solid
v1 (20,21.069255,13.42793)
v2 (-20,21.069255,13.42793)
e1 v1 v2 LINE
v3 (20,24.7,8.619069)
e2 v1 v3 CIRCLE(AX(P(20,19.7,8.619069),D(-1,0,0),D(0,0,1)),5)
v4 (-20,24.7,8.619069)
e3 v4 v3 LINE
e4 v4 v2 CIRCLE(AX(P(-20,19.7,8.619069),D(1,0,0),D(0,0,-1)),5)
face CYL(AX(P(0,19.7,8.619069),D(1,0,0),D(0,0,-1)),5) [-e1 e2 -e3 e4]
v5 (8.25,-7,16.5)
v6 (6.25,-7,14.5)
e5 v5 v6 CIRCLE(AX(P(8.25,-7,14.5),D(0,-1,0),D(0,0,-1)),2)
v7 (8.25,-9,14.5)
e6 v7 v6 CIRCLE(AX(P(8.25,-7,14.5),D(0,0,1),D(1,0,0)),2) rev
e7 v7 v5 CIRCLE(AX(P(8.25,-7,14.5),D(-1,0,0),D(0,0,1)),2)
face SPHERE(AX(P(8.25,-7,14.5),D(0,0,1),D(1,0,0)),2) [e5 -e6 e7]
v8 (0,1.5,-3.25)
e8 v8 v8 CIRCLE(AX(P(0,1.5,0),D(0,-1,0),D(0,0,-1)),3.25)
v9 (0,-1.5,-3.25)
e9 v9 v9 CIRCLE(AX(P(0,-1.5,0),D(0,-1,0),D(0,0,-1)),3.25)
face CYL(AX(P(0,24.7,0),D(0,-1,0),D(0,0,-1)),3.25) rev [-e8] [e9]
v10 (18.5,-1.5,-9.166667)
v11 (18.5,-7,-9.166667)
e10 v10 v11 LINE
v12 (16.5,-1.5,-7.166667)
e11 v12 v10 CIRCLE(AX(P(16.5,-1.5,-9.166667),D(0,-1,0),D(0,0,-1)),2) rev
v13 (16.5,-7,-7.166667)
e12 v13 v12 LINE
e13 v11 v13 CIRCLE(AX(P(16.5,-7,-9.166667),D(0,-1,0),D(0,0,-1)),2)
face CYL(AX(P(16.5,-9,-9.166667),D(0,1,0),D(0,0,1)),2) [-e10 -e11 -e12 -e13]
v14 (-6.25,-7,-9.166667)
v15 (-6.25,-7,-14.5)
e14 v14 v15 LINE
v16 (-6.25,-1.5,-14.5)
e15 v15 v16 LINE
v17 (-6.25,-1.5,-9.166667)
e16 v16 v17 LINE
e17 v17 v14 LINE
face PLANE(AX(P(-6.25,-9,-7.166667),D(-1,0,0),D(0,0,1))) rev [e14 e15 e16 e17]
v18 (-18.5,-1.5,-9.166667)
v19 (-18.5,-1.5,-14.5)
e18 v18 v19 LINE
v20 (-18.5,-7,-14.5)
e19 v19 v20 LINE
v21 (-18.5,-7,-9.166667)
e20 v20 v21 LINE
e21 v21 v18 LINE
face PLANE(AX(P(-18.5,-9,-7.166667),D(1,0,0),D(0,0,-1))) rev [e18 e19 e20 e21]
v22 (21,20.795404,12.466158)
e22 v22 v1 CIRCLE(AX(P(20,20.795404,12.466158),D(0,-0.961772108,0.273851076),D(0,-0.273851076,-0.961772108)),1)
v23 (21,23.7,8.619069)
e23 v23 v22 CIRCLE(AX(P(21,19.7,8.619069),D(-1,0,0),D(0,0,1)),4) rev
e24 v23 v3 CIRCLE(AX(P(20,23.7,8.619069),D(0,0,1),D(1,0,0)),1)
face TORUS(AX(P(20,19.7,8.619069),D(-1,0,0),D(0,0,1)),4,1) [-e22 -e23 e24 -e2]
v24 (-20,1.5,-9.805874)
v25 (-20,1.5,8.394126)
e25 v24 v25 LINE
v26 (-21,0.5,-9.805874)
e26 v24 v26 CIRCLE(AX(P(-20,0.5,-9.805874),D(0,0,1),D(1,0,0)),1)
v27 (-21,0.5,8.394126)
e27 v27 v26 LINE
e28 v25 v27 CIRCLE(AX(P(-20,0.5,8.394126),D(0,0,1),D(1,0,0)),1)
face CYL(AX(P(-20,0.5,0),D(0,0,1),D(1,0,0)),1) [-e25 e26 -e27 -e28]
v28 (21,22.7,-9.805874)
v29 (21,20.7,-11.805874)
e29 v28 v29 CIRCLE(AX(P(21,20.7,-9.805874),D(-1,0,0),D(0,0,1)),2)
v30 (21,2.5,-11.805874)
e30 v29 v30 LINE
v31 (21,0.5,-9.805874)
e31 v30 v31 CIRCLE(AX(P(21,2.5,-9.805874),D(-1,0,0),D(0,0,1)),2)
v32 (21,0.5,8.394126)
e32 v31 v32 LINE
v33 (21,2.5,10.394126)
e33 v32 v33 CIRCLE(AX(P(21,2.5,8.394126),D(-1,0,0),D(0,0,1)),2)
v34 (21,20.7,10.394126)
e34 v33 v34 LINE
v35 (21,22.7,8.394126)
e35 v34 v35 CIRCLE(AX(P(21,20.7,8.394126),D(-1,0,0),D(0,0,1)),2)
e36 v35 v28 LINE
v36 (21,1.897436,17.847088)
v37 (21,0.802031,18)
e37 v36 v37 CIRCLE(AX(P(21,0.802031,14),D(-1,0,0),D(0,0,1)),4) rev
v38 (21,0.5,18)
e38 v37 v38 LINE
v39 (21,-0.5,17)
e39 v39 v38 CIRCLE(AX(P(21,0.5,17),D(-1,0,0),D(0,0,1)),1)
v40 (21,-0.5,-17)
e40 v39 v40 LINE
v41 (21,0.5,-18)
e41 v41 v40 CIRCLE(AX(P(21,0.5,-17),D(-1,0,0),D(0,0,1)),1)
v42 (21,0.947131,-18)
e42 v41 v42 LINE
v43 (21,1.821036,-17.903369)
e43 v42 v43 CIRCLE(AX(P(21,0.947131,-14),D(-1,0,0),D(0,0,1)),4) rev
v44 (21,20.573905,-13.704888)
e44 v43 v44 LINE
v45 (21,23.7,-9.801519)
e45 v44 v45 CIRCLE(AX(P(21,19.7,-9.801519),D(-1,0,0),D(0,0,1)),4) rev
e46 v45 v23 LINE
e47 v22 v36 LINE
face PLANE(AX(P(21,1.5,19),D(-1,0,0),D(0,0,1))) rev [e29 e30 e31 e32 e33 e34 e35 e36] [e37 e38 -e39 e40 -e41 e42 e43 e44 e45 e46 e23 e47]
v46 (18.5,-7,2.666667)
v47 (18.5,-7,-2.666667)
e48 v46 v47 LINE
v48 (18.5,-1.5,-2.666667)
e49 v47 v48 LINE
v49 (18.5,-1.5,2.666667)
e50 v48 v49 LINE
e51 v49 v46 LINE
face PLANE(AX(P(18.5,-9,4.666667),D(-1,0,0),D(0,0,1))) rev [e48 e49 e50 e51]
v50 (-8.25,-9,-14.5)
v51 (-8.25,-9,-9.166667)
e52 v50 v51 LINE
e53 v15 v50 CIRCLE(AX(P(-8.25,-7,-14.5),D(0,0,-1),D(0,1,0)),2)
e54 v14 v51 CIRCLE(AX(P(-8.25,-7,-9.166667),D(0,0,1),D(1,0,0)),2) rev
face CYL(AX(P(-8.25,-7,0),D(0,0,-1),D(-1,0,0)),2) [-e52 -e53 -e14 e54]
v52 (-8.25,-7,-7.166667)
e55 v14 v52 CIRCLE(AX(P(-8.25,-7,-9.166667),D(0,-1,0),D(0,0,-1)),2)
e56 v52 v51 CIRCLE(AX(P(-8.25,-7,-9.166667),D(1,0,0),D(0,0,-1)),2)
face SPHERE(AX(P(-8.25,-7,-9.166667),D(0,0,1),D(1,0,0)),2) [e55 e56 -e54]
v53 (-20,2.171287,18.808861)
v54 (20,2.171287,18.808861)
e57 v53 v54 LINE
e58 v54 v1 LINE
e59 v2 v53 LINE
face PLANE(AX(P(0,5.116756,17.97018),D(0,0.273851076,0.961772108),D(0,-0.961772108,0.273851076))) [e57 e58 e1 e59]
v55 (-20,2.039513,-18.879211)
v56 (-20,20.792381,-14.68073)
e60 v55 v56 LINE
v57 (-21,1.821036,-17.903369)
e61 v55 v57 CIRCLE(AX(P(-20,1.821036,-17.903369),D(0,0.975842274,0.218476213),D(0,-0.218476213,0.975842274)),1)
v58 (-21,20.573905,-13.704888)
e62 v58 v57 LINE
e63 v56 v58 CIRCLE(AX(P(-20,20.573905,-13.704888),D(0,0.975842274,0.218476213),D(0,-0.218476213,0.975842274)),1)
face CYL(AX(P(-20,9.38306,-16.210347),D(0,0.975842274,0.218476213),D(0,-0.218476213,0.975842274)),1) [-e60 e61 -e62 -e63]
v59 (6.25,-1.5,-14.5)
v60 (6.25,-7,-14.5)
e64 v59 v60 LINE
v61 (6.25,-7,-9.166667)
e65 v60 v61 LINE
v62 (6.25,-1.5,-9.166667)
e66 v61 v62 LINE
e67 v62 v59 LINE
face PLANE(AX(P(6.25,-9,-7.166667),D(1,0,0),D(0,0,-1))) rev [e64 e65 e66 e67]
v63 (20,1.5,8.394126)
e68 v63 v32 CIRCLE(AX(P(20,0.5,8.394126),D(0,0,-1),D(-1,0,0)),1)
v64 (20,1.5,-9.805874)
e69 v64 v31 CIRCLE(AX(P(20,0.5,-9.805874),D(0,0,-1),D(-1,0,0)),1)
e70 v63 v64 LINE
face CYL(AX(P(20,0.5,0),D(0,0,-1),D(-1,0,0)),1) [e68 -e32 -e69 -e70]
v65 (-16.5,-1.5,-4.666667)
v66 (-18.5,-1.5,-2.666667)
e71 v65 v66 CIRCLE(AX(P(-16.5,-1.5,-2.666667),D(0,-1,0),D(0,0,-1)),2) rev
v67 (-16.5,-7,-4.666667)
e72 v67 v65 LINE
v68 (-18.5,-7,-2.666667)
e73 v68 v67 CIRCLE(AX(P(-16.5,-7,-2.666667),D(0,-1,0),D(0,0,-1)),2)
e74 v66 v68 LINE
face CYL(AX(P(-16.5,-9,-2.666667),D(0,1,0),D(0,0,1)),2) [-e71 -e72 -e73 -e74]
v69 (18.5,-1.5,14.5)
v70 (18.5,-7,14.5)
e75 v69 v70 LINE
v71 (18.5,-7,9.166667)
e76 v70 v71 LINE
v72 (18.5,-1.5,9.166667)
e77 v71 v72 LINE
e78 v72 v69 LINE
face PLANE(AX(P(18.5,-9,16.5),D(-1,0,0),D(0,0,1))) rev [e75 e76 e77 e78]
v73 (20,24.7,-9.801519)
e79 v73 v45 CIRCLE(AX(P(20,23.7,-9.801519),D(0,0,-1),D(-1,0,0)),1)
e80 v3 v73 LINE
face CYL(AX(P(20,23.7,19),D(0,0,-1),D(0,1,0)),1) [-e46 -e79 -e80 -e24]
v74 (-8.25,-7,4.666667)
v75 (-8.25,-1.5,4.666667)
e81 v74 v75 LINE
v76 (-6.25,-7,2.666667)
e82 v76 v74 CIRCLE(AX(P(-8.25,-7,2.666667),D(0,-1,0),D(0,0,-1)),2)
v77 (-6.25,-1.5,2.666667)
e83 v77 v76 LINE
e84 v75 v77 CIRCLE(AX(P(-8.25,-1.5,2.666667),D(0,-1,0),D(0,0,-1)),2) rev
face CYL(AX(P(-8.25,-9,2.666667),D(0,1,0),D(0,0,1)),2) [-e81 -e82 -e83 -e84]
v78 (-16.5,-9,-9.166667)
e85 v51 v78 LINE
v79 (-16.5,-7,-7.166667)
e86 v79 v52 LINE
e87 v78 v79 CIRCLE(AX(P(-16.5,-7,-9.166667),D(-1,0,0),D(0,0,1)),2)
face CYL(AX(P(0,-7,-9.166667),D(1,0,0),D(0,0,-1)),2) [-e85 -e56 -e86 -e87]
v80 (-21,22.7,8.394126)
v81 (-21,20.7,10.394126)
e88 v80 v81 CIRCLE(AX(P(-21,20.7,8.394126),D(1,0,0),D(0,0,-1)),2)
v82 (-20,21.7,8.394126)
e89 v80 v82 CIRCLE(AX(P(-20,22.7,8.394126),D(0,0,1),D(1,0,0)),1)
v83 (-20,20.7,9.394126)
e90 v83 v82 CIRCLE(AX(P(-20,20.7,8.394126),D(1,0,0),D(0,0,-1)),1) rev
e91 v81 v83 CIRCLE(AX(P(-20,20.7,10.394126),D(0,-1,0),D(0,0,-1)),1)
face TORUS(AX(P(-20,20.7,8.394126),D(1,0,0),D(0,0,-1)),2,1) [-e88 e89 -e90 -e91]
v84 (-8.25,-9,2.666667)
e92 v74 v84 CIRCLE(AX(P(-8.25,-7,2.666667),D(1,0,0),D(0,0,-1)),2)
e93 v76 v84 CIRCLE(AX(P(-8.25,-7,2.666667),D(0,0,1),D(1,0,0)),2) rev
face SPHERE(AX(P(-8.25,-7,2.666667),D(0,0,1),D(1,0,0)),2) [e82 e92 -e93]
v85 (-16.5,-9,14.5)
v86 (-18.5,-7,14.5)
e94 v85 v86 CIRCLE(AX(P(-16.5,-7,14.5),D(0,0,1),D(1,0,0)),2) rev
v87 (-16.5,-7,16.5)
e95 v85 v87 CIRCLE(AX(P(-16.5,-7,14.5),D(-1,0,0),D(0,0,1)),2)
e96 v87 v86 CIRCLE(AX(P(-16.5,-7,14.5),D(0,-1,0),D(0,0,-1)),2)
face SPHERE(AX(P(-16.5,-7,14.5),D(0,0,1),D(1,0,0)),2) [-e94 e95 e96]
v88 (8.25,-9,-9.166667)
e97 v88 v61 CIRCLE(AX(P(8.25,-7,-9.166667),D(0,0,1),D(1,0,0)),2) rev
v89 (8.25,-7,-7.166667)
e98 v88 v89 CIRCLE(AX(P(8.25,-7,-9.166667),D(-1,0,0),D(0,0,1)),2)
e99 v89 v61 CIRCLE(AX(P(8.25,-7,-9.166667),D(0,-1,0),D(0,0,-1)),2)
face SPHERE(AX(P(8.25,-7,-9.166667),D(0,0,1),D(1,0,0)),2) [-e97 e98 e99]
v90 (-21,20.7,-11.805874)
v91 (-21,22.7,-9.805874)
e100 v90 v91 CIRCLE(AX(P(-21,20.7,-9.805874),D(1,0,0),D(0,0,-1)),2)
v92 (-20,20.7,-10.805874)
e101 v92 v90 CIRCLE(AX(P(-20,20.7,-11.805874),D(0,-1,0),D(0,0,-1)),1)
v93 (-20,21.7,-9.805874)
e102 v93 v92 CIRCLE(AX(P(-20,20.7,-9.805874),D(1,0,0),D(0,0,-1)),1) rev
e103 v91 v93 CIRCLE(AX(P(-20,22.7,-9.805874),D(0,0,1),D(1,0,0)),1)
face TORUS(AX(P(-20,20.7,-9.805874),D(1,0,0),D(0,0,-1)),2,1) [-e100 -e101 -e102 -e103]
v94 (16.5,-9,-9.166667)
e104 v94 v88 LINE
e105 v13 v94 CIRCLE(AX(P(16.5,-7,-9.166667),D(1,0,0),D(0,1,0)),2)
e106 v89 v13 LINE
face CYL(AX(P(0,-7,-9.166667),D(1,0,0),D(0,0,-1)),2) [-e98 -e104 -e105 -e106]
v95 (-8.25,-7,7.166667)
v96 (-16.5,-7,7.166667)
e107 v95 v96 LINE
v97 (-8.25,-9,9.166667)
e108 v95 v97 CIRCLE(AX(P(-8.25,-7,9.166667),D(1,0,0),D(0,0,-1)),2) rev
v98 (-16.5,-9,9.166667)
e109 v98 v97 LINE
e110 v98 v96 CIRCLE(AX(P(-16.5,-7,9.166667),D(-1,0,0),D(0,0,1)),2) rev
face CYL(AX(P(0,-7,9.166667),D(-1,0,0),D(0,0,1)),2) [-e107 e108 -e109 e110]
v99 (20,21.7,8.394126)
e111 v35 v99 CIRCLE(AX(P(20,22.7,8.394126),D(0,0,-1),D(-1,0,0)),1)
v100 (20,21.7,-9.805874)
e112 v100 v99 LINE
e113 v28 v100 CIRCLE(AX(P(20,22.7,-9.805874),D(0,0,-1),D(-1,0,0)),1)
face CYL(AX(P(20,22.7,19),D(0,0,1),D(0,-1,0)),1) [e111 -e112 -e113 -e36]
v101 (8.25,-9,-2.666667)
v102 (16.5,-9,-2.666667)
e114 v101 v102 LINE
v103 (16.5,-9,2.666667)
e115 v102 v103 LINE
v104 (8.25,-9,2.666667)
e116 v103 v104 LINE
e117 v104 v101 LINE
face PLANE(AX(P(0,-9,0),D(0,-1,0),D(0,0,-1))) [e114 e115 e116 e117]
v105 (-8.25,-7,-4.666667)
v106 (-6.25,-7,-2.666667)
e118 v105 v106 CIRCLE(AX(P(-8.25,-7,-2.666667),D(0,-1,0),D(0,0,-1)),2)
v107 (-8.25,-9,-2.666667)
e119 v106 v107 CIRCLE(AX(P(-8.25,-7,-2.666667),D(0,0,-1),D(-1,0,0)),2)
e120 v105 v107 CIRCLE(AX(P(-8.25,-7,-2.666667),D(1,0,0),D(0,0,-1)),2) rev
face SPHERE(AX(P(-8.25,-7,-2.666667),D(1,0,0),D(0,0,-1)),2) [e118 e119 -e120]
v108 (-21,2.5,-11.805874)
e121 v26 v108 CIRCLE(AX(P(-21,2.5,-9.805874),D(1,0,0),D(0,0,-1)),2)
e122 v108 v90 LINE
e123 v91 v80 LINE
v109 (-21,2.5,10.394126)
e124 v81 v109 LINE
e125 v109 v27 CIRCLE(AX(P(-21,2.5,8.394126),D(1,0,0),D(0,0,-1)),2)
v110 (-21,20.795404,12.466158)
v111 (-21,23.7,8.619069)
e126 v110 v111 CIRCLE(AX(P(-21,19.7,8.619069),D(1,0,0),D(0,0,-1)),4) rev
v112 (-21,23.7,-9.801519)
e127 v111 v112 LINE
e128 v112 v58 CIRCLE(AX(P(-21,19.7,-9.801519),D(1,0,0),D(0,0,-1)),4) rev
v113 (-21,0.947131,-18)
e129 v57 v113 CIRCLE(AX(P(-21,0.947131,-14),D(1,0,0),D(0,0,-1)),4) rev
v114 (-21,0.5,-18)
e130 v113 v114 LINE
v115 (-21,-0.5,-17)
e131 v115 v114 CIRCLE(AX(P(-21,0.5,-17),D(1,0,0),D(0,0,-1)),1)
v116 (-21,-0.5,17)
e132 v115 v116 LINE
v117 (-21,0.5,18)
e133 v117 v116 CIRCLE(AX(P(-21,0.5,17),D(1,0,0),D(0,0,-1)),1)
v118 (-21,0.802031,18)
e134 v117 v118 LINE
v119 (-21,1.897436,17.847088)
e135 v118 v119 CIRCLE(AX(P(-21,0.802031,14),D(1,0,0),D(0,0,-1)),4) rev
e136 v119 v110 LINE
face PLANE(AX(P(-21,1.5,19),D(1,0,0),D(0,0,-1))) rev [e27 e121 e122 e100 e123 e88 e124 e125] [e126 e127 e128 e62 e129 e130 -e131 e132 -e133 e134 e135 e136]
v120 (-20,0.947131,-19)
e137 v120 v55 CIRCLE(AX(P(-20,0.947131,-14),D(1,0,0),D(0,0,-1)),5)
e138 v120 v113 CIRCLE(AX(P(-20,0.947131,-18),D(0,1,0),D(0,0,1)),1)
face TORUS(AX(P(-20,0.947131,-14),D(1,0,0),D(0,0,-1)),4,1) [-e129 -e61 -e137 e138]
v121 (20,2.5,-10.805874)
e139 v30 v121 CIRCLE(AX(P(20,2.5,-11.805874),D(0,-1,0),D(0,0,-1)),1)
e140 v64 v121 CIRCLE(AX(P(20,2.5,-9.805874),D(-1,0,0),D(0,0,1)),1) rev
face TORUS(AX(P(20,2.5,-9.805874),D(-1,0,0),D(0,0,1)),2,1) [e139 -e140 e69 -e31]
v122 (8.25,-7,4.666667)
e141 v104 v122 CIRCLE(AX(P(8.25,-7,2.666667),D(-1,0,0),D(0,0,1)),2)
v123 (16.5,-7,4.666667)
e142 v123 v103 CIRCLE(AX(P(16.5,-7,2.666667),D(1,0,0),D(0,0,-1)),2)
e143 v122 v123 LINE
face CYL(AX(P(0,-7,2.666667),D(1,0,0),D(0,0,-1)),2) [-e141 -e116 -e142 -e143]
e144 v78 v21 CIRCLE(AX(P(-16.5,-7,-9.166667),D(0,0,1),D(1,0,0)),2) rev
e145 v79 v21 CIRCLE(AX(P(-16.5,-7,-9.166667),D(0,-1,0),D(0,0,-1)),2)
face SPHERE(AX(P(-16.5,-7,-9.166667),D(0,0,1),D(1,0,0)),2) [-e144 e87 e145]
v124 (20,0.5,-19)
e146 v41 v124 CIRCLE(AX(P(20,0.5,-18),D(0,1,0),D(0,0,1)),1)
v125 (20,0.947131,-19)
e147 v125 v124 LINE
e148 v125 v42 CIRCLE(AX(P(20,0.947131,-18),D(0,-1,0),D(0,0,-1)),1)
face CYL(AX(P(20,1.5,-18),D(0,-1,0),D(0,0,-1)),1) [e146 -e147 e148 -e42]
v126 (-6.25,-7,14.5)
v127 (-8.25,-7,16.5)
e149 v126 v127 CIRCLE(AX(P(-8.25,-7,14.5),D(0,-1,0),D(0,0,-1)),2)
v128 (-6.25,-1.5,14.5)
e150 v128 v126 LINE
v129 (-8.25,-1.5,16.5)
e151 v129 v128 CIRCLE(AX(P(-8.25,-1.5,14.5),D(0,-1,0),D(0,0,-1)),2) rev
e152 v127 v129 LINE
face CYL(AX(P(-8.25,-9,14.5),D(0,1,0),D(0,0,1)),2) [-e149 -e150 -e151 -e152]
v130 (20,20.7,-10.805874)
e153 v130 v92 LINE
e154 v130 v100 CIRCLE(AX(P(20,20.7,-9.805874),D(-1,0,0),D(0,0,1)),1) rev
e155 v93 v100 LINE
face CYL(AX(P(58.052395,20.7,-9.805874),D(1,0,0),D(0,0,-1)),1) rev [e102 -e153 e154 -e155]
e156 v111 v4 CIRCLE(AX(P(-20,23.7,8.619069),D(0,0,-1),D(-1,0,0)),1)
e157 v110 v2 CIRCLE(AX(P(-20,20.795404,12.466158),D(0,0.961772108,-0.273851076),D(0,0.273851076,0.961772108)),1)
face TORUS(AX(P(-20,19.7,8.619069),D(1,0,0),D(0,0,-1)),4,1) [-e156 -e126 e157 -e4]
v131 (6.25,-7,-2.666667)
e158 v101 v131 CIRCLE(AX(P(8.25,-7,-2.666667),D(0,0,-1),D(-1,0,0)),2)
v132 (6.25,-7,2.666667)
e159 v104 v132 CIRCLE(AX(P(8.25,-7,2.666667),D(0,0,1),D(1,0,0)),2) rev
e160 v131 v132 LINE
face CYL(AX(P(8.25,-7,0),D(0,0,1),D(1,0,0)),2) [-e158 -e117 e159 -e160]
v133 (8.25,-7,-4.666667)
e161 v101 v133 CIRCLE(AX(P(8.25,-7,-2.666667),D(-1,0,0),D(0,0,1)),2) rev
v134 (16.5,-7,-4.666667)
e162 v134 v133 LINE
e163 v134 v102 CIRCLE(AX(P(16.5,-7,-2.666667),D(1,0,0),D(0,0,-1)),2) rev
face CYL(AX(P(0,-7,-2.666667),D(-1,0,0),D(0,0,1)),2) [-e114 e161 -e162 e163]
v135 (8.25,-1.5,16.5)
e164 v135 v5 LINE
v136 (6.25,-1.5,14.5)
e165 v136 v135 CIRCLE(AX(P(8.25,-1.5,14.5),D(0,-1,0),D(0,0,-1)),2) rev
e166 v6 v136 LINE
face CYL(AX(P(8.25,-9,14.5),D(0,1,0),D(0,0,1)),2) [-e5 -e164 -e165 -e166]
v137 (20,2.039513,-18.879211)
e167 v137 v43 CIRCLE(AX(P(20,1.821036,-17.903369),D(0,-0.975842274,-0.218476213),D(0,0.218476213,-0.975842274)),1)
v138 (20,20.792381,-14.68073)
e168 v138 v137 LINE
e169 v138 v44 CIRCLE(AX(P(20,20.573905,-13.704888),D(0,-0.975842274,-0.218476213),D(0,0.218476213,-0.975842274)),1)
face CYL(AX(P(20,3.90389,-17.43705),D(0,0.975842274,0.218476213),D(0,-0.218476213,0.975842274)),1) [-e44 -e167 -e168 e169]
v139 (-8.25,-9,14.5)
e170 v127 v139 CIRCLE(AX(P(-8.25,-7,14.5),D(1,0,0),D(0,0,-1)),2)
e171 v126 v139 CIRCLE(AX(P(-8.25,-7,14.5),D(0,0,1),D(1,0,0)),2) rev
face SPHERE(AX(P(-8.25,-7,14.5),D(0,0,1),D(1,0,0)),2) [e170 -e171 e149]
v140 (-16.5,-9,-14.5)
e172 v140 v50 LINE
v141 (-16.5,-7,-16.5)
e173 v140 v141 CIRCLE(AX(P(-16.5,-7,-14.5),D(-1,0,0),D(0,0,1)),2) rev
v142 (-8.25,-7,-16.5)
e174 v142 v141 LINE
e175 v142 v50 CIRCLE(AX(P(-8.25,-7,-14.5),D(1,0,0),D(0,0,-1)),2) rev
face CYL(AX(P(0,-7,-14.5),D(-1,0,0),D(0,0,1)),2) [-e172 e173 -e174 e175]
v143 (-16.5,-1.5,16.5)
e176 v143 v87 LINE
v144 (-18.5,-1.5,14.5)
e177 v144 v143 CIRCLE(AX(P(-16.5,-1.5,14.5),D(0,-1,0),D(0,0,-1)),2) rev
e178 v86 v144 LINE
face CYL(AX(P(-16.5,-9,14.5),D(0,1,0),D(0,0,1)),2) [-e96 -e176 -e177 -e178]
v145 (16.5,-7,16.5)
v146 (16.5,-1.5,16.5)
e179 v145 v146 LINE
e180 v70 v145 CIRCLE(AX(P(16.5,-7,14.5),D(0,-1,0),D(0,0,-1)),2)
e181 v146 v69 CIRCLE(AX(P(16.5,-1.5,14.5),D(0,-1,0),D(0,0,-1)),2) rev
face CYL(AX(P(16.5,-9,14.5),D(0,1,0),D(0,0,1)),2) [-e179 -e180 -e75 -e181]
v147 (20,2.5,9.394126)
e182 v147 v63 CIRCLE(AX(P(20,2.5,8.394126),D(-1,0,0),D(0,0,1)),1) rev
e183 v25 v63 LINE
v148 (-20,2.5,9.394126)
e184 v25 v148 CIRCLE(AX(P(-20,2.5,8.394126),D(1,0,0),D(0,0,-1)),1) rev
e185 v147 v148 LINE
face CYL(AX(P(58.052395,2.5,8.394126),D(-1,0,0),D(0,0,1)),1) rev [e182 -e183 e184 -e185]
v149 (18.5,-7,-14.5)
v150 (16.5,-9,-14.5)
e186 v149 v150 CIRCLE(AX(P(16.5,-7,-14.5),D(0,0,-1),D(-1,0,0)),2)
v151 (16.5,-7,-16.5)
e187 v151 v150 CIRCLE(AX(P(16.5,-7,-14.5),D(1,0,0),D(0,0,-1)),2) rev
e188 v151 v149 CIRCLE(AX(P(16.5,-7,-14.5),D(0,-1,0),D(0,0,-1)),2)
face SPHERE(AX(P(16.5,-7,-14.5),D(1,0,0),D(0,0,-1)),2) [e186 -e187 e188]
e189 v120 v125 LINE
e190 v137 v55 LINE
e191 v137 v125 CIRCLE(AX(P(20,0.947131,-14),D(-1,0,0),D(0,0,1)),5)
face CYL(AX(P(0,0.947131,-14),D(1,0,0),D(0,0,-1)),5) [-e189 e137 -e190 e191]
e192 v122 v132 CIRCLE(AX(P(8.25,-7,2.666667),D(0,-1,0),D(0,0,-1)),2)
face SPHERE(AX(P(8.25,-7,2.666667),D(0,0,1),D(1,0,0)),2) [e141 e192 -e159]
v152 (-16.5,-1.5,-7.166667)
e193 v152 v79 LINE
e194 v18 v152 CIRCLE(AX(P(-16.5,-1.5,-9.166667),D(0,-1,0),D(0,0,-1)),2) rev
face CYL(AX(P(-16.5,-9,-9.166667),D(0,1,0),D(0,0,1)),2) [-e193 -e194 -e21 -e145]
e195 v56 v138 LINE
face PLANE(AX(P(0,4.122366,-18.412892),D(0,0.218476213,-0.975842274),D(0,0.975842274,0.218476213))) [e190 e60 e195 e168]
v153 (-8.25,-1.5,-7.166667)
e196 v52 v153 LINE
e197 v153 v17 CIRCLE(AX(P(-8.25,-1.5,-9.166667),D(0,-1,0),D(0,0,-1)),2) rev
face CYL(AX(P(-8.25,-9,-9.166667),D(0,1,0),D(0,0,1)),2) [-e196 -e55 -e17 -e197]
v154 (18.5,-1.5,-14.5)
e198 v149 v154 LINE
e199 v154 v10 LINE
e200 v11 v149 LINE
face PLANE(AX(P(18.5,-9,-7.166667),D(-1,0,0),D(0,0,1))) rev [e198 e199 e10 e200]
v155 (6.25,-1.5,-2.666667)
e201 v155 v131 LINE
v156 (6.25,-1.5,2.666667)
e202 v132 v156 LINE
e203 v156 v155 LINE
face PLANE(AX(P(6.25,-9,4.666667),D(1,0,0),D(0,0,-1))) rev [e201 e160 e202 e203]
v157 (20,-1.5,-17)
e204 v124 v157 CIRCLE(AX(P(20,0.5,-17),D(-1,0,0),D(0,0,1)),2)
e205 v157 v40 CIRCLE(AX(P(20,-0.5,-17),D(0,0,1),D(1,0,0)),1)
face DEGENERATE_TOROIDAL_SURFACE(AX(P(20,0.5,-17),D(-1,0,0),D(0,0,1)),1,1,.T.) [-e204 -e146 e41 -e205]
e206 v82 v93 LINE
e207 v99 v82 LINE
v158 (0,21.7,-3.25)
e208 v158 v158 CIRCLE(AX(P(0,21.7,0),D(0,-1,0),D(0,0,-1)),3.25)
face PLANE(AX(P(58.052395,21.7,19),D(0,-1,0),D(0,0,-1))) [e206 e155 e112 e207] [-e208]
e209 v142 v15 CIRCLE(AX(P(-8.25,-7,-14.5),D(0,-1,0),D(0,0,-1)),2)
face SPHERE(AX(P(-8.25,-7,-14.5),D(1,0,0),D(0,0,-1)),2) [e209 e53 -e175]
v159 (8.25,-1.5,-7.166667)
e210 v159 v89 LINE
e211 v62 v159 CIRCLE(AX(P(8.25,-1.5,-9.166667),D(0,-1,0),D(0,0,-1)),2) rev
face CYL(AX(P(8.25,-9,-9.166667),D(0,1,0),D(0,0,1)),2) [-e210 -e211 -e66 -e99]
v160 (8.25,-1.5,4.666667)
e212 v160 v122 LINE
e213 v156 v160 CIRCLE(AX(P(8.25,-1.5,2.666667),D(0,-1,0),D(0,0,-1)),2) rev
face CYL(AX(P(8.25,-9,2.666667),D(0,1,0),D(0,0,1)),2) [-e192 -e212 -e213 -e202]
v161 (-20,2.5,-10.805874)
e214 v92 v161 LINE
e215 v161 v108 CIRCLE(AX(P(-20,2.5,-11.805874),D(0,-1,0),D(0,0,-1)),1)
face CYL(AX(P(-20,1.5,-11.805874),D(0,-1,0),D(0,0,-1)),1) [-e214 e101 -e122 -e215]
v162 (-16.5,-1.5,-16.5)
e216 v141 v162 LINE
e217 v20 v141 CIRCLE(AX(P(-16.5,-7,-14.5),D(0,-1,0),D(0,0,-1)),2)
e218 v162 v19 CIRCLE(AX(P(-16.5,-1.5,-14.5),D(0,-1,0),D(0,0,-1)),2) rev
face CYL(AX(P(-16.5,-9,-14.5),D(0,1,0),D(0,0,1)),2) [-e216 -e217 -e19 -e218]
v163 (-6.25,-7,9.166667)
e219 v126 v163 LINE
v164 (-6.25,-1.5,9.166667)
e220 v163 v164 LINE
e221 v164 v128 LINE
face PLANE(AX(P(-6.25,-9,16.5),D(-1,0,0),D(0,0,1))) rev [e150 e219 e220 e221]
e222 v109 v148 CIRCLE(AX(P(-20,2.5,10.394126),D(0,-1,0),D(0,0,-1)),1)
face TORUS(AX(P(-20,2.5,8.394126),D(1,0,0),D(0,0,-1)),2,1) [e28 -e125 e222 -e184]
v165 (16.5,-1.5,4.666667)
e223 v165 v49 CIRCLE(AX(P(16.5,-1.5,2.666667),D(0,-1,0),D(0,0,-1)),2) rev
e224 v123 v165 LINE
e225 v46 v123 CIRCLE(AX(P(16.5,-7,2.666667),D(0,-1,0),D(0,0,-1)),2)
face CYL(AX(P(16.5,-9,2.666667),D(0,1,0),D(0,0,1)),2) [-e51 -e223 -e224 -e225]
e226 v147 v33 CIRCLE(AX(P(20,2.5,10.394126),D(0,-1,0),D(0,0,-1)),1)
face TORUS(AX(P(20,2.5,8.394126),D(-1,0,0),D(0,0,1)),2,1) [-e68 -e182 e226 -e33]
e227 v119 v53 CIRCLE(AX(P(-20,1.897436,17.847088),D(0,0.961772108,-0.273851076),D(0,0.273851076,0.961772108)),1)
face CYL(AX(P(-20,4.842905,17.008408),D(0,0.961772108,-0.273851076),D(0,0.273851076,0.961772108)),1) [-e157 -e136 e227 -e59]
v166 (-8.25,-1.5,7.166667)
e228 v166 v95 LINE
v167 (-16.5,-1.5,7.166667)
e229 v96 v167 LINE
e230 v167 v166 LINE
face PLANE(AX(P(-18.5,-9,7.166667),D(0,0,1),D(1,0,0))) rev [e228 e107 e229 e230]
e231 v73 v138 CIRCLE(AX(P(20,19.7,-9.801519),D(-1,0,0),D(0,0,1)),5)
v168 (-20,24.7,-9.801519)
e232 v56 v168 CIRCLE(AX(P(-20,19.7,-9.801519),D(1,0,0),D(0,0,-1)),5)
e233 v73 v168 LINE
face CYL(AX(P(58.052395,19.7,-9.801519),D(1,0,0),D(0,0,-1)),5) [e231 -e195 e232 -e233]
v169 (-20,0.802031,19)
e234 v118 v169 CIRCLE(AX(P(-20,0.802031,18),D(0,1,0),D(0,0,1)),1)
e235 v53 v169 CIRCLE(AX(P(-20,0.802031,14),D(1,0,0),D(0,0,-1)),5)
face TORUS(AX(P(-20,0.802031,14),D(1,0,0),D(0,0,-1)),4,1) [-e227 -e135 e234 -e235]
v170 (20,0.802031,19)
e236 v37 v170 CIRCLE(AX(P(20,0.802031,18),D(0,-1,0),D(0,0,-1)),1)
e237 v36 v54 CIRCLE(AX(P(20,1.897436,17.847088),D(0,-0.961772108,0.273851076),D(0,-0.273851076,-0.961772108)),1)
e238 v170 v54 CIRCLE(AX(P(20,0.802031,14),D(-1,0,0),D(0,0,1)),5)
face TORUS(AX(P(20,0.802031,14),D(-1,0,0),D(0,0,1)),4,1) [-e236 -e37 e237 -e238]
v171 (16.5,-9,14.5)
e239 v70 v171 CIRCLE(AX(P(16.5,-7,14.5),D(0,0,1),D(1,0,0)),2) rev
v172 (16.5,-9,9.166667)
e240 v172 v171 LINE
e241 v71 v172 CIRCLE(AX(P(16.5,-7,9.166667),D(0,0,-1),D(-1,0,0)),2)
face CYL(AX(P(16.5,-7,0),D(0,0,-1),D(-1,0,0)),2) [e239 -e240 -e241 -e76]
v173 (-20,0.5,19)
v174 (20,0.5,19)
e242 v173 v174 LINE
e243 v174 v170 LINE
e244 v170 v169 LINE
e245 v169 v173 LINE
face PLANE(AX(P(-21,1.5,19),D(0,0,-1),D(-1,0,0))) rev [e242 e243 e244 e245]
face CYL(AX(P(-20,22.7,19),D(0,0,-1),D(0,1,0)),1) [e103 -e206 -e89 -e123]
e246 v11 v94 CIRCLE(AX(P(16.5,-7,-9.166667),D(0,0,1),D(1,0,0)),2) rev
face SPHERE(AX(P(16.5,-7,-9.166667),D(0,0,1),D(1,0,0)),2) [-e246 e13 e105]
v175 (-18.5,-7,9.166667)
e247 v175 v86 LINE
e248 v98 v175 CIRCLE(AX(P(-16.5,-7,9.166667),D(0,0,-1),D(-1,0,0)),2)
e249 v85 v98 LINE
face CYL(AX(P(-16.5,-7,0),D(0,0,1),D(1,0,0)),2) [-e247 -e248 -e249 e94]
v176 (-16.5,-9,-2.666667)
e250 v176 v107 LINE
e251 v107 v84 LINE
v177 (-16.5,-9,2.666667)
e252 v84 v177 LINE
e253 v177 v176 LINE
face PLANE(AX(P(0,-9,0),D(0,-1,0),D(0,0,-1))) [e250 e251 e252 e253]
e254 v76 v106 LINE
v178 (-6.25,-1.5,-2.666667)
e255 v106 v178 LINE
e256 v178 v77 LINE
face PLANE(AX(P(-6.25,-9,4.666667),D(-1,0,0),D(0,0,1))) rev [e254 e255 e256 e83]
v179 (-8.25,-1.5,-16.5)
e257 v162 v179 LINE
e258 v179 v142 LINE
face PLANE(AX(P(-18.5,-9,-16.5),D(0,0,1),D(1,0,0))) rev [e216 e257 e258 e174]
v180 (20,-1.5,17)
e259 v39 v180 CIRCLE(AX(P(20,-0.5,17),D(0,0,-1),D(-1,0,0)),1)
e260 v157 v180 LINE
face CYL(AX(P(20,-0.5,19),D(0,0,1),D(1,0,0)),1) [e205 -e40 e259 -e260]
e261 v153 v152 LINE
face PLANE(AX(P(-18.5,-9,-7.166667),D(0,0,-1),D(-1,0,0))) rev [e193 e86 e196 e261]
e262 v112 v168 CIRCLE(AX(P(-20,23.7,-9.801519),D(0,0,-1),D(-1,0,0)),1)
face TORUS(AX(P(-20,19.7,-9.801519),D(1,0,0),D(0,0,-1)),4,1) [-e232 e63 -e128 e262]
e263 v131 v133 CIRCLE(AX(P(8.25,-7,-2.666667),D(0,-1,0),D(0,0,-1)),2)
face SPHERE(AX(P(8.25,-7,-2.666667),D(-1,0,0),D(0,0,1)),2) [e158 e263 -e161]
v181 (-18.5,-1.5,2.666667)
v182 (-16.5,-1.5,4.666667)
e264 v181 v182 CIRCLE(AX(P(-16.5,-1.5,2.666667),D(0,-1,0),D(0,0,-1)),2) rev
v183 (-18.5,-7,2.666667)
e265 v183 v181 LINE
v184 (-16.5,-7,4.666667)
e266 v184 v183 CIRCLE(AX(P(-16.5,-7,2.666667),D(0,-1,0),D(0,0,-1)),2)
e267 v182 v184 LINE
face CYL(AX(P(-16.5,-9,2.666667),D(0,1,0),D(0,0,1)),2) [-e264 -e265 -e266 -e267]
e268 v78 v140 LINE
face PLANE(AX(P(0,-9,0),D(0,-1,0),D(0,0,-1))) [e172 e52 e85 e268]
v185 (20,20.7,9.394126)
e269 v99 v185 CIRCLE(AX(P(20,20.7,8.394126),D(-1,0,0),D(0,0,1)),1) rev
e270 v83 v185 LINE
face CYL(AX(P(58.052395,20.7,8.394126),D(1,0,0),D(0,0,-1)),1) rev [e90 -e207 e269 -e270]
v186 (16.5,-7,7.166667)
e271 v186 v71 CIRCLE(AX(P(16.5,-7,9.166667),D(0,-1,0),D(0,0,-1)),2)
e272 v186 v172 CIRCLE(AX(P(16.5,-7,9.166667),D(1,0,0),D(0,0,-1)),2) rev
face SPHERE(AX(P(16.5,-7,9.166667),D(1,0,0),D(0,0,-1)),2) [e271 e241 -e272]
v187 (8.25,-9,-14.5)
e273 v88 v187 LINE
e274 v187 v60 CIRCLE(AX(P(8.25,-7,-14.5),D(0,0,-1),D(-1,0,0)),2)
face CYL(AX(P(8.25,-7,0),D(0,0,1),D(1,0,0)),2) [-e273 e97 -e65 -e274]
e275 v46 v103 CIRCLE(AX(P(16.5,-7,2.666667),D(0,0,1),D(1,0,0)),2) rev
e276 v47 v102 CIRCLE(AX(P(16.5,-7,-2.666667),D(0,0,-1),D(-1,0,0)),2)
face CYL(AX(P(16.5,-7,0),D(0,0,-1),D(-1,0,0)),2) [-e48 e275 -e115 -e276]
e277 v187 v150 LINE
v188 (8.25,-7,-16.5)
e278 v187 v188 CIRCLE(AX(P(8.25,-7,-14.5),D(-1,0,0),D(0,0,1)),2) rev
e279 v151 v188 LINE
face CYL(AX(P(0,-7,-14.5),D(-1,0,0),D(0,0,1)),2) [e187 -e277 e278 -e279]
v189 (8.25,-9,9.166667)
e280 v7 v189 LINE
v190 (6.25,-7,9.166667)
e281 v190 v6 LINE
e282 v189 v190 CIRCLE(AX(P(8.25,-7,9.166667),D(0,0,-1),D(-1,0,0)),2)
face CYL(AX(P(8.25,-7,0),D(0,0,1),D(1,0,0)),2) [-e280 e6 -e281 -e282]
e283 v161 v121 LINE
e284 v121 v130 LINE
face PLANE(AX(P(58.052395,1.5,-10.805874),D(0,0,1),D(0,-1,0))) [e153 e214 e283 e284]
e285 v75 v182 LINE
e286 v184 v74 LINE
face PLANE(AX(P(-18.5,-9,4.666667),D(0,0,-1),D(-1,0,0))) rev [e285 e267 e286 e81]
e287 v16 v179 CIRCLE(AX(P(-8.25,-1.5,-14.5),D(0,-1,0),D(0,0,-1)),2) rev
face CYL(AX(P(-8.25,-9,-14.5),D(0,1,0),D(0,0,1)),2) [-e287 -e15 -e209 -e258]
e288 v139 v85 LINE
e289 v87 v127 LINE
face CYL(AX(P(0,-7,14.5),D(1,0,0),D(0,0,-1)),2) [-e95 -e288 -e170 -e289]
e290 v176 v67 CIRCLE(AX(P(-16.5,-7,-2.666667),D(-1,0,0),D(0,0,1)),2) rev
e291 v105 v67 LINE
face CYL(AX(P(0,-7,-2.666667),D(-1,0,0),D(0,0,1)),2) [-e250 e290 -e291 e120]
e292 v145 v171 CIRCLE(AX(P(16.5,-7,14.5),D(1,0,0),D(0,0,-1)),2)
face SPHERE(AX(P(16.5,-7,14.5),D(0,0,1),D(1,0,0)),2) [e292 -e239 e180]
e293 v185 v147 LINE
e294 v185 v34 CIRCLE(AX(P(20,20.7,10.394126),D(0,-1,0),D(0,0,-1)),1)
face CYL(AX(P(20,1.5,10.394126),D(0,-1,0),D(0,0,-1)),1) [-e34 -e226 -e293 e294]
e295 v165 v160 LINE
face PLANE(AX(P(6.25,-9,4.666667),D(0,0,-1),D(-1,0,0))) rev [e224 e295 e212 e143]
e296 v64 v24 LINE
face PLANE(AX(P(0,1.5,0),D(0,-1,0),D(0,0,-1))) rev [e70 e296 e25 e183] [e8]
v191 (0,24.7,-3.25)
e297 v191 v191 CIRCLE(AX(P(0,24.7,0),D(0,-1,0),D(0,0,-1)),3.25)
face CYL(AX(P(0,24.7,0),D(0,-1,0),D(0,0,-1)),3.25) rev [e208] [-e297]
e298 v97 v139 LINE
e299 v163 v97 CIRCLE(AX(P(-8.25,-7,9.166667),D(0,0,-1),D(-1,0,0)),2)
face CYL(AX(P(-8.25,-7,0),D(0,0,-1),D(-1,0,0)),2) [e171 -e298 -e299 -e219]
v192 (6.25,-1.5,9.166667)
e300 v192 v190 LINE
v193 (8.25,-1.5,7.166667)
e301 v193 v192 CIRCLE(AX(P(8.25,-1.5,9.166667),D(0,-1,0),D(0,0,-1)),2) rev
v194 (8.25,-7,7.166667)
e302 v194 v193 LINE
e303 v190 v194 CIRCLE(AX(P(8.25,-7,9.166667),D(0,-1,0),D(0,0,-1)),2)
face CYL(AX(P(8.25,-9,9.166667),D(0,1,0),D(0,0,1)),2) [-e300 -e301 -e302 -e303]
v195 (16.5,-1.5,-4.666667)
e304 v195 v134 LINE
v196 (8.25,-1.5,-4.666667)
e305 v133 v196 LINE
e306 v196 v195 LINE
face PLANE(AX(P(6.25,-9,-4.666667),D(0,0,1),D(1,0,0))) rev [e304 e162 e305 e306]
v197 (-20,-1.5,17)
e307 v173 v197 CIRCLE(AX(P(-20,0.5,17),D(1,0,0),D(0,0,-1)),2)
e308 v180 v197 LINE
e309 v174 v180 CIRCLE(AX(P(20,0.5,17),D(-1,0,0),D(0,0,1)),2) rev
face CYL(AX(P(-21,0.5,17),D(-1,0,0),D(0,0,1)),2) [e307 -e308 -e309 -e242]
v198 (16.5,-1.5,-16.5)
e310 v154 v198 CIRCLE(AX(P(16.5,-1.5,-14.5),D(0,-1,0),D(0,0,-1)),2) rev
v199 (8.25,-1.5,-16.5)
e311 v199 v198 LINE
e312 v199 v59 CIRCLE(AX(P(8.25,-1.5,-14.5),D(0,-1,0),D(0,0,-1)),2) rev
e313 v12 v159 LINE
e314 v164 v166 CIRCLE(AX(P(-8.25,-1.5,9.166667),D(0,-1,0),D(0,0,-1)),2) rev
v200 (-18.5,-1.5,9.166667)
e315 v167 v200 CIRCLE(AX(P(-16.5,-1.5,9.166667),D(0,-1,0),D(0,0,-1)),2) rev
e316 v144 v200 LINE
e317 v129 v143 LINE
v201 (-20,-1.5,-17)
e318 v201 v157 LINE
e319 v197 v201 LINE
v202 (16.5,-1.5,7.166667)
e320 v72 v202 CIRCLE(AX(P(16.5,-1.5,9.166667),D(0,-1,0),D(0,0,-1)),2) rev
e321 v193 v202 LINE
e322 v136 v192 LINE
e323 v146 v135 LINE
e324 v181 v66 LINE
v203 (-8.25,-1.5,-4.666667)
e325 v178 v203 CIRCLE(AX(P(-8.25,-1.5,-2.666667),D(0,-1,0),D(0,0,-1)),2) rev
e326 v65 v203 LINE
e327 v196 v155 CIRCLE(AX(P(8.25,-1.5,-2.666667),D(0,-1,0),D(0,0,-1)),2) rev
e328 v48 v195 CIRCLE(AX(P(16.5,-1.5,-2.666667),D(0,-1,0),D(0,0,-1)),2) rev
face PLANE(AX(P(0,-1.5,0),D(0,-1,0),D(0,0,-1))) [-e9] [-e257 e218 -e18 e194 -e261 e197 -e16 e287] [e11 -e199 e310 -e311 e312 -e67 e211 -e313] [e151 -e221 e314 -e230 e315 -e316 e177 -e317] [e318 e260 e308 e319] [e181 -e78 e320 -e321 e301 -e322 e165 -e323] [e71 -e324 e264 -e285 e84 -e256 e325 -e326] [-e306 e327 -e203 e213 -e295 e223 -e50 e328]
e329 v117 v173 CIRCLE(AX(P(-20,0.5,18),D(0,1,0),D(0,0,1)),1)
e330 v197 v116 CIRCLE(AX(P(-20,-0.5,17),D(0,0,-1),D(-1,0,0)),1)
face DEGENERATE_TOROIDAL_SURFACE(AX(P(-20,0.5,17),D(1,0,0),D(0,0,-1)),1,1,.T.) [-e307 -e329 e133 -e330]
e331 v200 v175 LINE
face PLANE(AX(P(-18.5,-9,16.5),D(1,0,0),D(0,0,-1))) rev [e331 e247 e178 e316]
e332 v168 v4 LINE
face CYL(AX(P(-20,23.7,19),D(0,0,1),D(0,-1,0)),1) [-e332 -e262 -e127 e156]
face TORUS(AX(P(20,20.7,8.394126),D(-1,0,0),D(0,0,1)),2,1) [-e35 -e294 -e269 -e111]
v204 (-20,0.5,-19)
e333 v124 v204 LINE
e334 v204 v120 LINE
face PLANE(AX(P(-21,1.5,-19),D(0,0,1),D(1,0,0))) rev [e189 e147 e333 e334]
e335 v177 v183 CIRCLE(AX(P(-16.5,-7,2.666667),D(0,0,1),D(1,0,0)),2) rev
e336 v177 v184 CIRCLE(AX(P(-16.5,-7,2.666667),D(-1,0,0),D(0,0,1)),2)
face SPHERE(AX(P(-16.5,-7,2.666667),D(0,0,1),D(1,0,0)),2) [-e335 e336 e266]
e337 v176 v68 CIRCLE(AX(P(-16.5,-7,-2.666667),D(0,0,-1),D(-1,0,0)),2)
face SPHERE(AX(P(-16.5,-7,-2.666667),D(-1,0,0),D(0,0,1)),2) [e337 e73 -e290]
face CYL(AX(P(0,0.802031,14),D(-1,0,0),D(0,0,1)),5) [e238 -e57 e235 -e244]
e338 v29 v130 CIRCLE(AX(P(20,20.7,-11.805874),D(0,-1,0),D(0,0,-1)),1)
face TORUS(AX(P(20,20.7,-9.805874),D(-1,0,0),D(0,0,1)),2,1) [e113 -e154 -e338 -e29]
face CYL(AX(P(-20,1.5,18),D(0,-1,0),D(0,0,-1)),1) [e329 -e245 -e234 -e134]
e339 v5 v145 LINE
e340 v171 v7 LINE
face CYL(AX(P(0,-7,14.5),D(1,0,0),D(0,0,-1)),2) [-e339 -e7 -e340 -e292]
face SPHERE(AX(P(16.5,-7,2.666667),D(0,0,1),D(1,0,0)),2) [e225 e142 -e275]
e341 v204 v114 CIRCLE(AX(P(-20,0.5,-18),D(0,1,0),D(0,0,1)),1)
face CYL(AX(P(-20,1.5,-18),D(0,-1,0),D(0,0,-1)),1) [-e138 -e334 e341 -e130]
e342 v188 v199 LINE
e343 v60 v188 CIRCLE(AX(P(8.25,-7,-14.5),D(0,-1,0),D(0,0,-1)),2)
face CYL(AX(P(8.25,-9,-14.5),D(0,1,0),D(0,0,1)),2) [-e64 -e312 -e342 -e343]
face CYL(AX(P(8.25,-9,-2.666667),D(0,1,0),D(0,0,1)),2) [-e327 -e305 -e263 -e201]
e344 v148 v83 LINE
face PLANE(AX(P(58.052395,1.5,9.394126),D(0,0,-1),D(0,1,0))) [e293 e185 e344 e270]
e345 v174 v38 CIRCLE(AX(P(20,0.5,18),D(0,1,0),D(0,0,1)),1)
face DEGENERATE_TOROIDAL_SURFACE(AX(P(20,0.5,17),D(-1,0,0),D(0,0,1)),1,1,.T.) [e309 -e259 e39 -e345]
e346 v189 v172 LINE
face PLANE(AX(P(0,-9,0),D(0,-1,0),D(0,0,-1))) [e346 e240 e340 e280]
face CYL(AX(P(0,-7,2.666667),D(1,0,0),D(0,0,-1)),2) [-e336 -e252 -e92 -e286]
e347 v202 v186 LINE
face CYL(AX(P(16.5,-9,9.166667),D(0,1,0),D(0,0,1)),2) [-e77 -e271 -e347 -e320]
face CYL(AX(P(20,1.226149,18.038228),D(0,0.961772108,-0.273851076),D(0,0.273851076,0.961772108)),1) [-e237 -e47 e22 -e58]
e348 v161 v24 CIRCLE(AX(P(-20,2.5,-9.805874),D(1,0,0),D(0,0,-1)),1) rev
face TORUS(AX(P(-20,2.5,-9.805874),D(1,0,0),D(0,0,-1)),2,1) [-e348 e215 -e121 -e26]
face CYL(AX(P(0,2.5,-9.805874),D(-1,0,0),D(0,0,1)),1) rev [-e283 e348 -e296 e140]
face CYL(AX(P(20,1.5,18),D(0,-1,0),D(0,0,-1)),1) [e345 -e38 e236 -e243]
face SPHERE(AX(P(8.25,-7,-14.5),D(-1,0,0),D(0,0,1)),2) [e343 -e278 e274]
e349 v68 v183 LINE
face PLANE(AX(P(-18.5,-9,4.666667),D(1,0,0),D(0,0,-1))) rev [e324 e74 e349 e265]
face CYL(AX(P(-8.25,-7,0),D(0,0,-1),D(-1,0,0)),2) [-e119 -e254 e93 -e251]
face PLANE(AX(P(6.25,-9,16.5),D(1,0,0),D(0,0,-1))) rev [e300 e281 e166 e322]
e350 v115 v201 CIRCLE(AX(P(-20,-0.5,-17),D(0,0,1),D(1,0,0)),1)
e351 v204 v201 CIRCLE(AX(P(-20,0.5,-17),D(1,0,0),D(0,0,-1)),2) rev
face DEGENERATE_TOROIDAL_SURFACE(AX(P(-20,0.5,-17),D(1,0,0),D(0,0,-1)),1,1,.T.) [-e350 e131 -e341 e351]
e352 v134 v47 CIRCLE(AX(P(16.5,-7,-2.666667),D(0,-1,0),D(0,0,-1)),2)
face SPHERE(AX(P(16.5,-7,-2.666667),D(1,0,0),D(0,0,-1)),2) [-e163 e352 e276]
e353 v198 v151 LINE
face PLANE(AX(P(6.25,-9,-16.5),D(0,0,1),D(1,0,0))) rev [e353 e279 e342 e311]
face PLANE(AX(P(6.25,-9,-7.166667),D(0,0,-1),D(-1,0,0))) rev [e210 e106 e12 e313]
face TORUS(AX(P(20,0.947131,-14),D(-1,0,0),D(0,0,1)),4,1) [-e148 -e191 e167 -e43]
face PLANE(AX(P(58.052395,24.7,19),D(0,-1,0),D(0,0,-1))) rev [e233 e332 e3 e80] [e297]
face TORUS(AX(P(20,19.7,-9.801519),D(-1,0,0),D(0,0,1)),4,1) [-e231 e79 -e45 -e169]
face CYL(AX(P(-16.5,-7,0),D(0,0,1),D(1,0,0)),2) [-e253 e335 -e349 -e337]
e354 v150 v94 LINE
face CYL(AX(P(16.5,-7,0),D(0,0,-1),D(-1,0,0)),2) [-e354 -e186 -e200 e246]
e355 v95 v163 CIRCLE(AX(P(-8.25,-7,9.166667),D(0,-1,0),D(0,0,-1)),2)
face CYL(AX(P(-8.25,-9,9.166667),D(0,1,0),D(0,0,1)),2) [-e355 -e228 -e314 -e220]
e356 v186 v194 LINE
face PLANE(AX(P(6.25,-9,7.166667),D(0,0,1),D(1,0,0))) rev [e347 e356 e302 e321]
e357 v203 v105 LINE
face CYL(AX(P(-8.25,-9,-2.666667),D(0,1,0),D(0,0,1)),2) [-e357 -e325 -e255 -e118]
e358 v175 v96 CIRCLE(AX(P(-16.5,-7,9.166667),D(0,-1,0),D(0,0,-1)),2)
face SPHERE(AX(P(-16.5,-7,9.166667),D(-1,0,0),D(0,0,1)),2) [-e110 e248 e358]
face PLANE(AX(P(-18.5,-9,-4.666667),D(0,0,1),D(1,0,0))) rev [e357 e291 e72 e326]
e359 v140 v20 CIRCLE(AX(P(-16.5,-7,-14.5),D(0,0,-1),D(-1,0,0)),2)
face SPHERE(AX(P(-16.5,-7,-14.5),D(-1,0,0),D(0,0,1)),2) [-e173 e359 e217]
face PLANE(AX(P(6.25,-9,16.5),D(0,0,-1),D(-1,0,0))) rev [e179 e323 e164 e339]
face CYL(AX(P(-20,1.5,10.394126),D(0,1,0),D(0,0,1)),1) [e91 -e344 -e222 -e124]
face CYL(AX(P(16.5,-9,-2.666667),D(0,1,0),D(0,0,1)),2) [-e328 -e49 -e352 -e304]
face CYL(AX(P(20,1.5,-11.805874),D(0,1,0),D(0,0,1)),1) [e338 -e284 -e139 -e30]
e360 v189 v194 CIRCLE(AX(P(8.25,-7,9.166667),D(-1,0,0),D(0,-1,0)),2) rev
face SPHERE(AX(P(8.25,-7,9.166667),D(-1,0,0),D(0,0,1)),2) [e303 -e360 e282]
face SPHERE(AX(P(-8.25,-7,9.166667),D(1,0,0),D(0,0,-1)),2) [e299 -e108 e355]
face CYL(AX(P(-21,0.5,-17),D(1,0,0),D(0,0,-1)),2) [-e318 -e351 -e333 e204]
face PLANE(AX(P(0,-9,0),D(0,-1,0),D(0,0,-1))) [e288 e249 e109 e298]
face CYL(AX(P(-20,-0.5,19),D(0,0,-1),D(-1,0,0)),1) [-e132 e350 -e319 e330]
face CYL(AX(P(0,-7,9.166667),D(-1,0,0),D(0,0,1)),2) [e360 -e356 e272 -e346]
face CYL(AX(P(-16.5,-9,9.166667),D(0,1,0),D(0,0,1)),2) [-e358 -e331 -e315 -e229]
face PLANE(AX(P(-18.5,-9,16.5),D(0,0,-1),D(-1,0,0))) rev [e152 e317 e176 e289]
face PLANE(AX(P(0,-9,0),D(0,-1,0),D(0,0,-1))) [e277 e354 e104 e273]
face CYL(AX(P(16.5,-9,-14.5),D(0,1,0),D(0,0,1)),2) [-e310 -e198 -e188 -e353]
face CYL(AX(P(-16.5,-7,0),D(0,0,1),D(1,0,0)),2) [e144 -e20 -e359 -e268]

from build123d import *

# Parameters (mm, degrees)
ESBO_O1_W                = 42
ESBO_O1_H                = 38
RESSALTO_EXTRUS_O1_DEPTH = 1.5
ESBO_O2_W                = 12.25
ESBO_O2_H                = 9.333333333
ESBO_O2_H_2              = 9.333333334
RESSALTO_EXTRUS_O2_DEPTH = 7.5
FILETE1_R                = 2
RESSALTO_EXTRUS_O3_START = -21
ESBO_O5_W                = 26.2
ESBO_O5_H                = 26.2
ESBO_O5_W_2              = 20.2
ESBO_O5_H_2              = 20.2
RESSALTO_EXTRUS_O3_DEPTH = 42
ESBO_O3_R                = 3.25
CORTE_EXTRUS_O1_DEPTH    = 39.580305857
LOFT3_START              = -21
LOFT3_DEPTH              = 42
LOFT4_START              = -21
LOFT4_DEPTH              = 42
FILETE8_START            = -22
FILETE8_DEPTH            = 44
FILETE9_R                = 1
FILETE10_R               = 1
FILETE11_R               = 2


with BuildPart() as part:
    # Esboço1 → Ressalto-extrusão1 (new, symmetric)
    with BuildSketch(Plane(origin=(0, 0, 0), x_dir=(1, 0, 0), z_dir=(0, 1, 0))):
        Rectangle(ESBO_O1_W, ESBO_O1_H)
    extrude(amount=RESSALTO_EXTRUS_O1_DEPTH, both=True)

    # Esboço2 → Ressalto-extrusão2 (add)
    with BuildSketch(Plane.XZ.offset(1.5)):
        with Locations((-12.375, 11.833333334)):
            Rectangle(ESBO_O2_W, ESBO_O2_H)
        with Locations((-12.375, 0)):
            Rectangle(ESBO_O2_W, ESBO_O2_H_2)
        with Locations((12.375, 11.833333334)):
            Rectangle(ESBO_O2_W, ESBO_O2_H)
        with Locations((12.375, 0)):
            Rectangle(ESBO_O2_W, ESBO_O2_H_2)
        with Locations((-12.375, -11.833333334)):
            Rectangle(ESBO_O2_W, ESBO_O2_H)
        with Locations((12.375, -11.833333334)):
            Rectangle(ESBO_O2_W, ESBO_O2_H)
    extrude(amount=RESSALTO_EXTRUS_O2_DEPTH)

    # Filete1
    filete1_edges = [part.edges().sort_by_distance(p)[0] for p in [
        (-6.25, -5.25, 7.166666667),
        (-6.25, -5.25, 16.5),
        (-18.5, -5.25, 16.5),
        (-18.5, -5.25, 7.166666667),
        (-6.25, -9, 11.833333333),
        (-12.375, -9, 16.5),
        (-18.5, -9, 11.833333333),
        (-12.375, -9, 7.166666667),
        (18.5, -5.25, 7.166666667),
        (18.5, -5.25, 16.5),
        (6.25, -5.25, 16.5),
        (6.25, -5.25, 7.166666667),
        (18.5, -9, 11.833333333),
        (12.375, -9, 16.5),
        (6.25, -9, 11.833333333),
        (12.375, -9, 7.166666667),
        (-6.25, -5.25, -4.666666667),
        (-6.25, -5.25, 4.666666667),
        (-18.5, -5.25, 4.666666667),
        (-18.5, -5.25, -4.666666667),
        (-6.25, -9, 0),
        (-12.375, -9, 4.666666667),
        (-18.5, -9, 0),
        (-12.375, -9, -4.666666667),
        (18.5, -5.25, -4.666666667),
        (18.5, -5.25, 4.666666667),
        (6.25, -5.25, 4.666666667),
        (6.25, -5.25, -4.666666667),
        (18.5, -9, 0),
        (12.375, -9, 4.666666667),
        (6.25, -9, 0),
        (12.375, -9, -4.666666667),
        (-6.25, -5.25, -16.5),
        (-6.25, -5.25, -7.166666667),
        (-18.5, -5.25, -7.166666667),
        (-18.5, -5.25, -16.5),
        (-6.25, -9, -11.833333333),
        (-12.375, -9, -7.166666667),
        (-18.5, -9, -11.833333333),
        (-12.375, -9, -16.5),
        (18.5, -5.25, -16.5),
        (18.5, -5.25, -7.166666667),
        (6.25, -5.25, -7.166666667),
        (6.25, -5.25, -16.5),
        (18.5, -9, -11.833333333),
        (12.375, -9, -7.166666667),
        (6.25, -9, -11.833333333),
        (12.375, -9, -16.5),
    ]]
    fillet(filete1_edges, radius=FILETE1_R)

    # Esboço5 → Ressalto-extrusão3 (add)
    with BuildSketch(Plane(origin=(0, 0, 0), x_dir=(0, 0, -1), z_dir=(1, 0, 0)).offset(RESSALTO_EXTRUS_O3_START)):
        with Locations((0.705873589, 11.6)):
            Rectangle(ESBO_O5_W, ESBO_O5_H)
        with Locations((0.705873589, 11.6)):
            Rectangle(ESBO_O5_W_2, ESBO_O5_H_2, mode=Mode.SUBTRACT)
    extrude(amount=RESSALTO_EXTRUS_O3_DEPTH)

    # Esboço3 → Corte-extrusão1 (cut, through all)
    with BuildSketch(Plane.XZ.offset(1.5)):
        with Locations(Location((0, 0, 0), (0, 0, 270))):
            Circle(ESBO_O3_R)
    extrude(amount=-CORTE_EXTRUS_O1_DEPTH, mode=Mode.SUBTRACT)

    # Loft3: read off the stored shape, not the designer's step
    # Loft3 outline → Loft3 (add)
    with BuildSketch(Plane.YZ.offset(LOFT3_START)):
        Polygon((1.5, 12.394126411), (24.7, 12.394126411), (1.5, 19), align=None)
    extrude(amount=LOFT3_DEPTH)

    # Loft4: read off the stored shape, not the designer's step
    # Loft4 outline → Loft4 (add)
    with BuildSketch(Plane.YZ.offset(LOFT4_START)):
        Polygon((1.5, -13.805873589), (1.5, -19), (24.70005, -13.805862395), align=None)
    extrude(amount=LOFT4_DEPTH)

    # Filete8: read off the stored shape, not the designer's step
    # Filete8 outline → Filete8 (cut)
    with BuildSketch(Plane.YZ.offset(FILETE8_START)):
        with BuildLine():
            ThreePointArc((0.802031375, 19), (1.49329735, 18.951984587), (2.171286756, 18.808860541))
            Line((2.171286756, 18.808860541), (1.5, 19))
            Line((1.5, 19), (0.802031375, 19))
        make_face()
        with BuildLine():
            ThreePointArc((21.069255381, 13.427929858), (23.69038074, 11.631852341), (24.7, 8.619069318))
            Line((24.7, 8.619069318), (24.7, 12.394126411))
            Line((24.7, 12.394126411), (21.069255381, 13.427929858))
        make_face()
        with BuildLine():
            ThreePointArc((24.7, -9.801518542), (23.602685314, -12.927066069), (20.792381063, -14.680729914))
            Line((20.792381063, -14.680729914), (24.70005, -13.805862395))
            Line((24.70005, -13.805862395), (24.7, -9.801518542))
        make_face()
        with BuildLine():
            ThreePointArc((2.039512508, -18.879211372), (1.496650844, -18.969711101), (0.947131445, -19))
            Line((0.947131445, -19), (1.5, -19))
            Line((1.5, -19), (2.039512508, -18.879211372))
        make_face()
    extrude(amount=FILETE8_DEPTH, mode=Mode.SUBTRACT)

    # Filete9
    filete9_edges = [part.edges().sort_by_distance(p)[0] for p in [
        (0, 21.7, -10.805873589),
        (0, 21.7, 9.394126411),
        (0, 1.5, 9.394126411),
        (0, 1.5, -10.805873589),
    ]]
    fillet(filete9_edges, radius=FILETE9_R)

    # Filete10
    filete10_edges = [part.edges().sort_by_distance(p)[0] for p in [
        (-21, 1.792893219, 9.101233192),
        (21, 11.6, 9.394126411),
        (-21, 11.6, 9.394126411),
        (-21, 21.407106781, 9.101233192),
        (-21, 21.7, -0.705873589),
        (21, 21.7, -0.705873589),
        (-21, 21.407106781, -10.512980371),
        (-21, 11.6, -10.805873589),
        (21, 11.6, -10.805873589),
        (-21, 1.792893219, -10.512980371),
        (-21, 1.5, -0.705873589),
        (-21, 23.602685314, -12.927066069),
        (21, 24.7, -0.591224612),
        (-21, 24.7, -0.591224612),
        (-21, 23.69038074, 11.631852341),
        (-21, 11.620271069, 16.1183952),
        (21, 11.620271069, 16.1183952),
        (-21, 1.49329735, 18.951984587),
        (-21, -0.348984312, 19),
        (-21, -1.5, 0),
        (-21, -0.276434277, -19),
        (-21, 1.496650844, -18.969711101),
        (21, 11.415946785, -16.779970643),
        (-21, 11.415946785, -16.779970643),
        (21, 1.792893219, -10.512980371),
        (21, 21.407106781, -10.512980371),
        (21, 21.407106781, 9.101233192),
        (21, 1.792893219, 9.101233192),
        (21, 1.5, -0.705873589),
        (21, -1.5, 0),
        (21, -0.348984313, 19),
        (21, 1.49329735, 18.951984587),
        (21, 23.69038074, 11.631852341),
        (21, 23.602685314, -12.927066069),
        (21, 1.496650844, -18.969711101),
        (21, -0.276434277, -19),
    ]]
    fillet(filete10_edges, radius=FILETE10_R)

    # Filete11
    # the kernel refuses this fillet: 2 mm, written as the material it takes off along each edge
    with BuildSketch(Plane(origin=(-21, 0.5, 17), x_dir=(0, -1, 0), z_dir=(0, 0, -1))) as filete11_piece_1:
        with BuildLine():
            CenterArc((1, -1), 1, 0, 90)
            Line((2, -1), (2, 0))
            Line((2, 0), (1, 0))
        make_face()
    revolve(axis=Axis((-21, 0.5, 17), (-1, 0, 0)), revolution_arc=90, mode=Mode.SUBTRACT)
    with BuildSketch(Plane(origin=(-21, 0.5, -17), x_dir=(0, 0, -1), z_dir=(0, 1, 0))) as filete11_piece_2:
        with BuildLine():
            CenterArc((1, -1), 1, 0, 90)
            Line((2, -1), (2, 0))
            Line((2, 0), (1, 0))
        make_face()
    revolve(axis=Axis((-21, 0.5, -17), (-1, 0, 0)), revolution_arc=90, mode=Mode.SUBTRACT)
    with BuildSketch(Plane(origin=(21, 0.5, 17), x_dir=(0, 0, 1), z_dir=(0, 1, 0))) as filete11_piece_3:
        with BuildLine():
            CenterArc((1, -1), 1, 0, 90)
            Line((2, -1), (2, 0))
            Line((2, 0), (1, 0))
        make_face()
    revolve(axis=Axis((21, 0.5, 17), (1, 0, 0)), revolution_arc=90, mode=Mode.SUBTRACT)
    with BuildSketch(Plane(origin=(21, 0.5, -17), x_dir=(0, -1, 0), z_dir=(0, 0, 1))) as filete11_piece_4:
        with BuildLine():
            CenterArc((1, -1), 1, 0, 90)
            Line((2, -1), (2, 0))
            Line((2, 0), (1, 0))
        make_face()
    revolve(axis=Axis((21, 0.5, -17), (1, 0, 0)), revolution_arc=90, mode=Mode.SUBTRACT)
    with BuildSketch(Plane(origin=(-21, -1.5, 19), x_dir=(0, 1, 0), z_dir=(1, 0, 0))) as filete11_piece_5:
        with BuildLine():
            CenterArc((FILETE11_R, -FILETE11_R), FILETE11_R, 90, 90)
            Line((0, -FILETE11_R), (0, 0))
            Line((0, 0), (FILETE11_R, 0))
        make_face()
    extrude(amount=42, mode=Mode.SUBTRACT)
    with BuildSketch(Plane(origin=(21, -1.5, -19), x_dir=(0, 0, 1), z_dir=(-1, 0, 0))) as filete11_piece_6:
        with BuildLine():
            CenterArc((FILETE11_R, FILETE11_R), FILETE11_R, 180, 90)
            Line((0, FILETE11_R), (0, 0))
            Line((0, 0), (FILETE11_R, 0))
        make_face()
    extrude(amount=42, mode=Mode.SUBTRACT)


solid = part.part
